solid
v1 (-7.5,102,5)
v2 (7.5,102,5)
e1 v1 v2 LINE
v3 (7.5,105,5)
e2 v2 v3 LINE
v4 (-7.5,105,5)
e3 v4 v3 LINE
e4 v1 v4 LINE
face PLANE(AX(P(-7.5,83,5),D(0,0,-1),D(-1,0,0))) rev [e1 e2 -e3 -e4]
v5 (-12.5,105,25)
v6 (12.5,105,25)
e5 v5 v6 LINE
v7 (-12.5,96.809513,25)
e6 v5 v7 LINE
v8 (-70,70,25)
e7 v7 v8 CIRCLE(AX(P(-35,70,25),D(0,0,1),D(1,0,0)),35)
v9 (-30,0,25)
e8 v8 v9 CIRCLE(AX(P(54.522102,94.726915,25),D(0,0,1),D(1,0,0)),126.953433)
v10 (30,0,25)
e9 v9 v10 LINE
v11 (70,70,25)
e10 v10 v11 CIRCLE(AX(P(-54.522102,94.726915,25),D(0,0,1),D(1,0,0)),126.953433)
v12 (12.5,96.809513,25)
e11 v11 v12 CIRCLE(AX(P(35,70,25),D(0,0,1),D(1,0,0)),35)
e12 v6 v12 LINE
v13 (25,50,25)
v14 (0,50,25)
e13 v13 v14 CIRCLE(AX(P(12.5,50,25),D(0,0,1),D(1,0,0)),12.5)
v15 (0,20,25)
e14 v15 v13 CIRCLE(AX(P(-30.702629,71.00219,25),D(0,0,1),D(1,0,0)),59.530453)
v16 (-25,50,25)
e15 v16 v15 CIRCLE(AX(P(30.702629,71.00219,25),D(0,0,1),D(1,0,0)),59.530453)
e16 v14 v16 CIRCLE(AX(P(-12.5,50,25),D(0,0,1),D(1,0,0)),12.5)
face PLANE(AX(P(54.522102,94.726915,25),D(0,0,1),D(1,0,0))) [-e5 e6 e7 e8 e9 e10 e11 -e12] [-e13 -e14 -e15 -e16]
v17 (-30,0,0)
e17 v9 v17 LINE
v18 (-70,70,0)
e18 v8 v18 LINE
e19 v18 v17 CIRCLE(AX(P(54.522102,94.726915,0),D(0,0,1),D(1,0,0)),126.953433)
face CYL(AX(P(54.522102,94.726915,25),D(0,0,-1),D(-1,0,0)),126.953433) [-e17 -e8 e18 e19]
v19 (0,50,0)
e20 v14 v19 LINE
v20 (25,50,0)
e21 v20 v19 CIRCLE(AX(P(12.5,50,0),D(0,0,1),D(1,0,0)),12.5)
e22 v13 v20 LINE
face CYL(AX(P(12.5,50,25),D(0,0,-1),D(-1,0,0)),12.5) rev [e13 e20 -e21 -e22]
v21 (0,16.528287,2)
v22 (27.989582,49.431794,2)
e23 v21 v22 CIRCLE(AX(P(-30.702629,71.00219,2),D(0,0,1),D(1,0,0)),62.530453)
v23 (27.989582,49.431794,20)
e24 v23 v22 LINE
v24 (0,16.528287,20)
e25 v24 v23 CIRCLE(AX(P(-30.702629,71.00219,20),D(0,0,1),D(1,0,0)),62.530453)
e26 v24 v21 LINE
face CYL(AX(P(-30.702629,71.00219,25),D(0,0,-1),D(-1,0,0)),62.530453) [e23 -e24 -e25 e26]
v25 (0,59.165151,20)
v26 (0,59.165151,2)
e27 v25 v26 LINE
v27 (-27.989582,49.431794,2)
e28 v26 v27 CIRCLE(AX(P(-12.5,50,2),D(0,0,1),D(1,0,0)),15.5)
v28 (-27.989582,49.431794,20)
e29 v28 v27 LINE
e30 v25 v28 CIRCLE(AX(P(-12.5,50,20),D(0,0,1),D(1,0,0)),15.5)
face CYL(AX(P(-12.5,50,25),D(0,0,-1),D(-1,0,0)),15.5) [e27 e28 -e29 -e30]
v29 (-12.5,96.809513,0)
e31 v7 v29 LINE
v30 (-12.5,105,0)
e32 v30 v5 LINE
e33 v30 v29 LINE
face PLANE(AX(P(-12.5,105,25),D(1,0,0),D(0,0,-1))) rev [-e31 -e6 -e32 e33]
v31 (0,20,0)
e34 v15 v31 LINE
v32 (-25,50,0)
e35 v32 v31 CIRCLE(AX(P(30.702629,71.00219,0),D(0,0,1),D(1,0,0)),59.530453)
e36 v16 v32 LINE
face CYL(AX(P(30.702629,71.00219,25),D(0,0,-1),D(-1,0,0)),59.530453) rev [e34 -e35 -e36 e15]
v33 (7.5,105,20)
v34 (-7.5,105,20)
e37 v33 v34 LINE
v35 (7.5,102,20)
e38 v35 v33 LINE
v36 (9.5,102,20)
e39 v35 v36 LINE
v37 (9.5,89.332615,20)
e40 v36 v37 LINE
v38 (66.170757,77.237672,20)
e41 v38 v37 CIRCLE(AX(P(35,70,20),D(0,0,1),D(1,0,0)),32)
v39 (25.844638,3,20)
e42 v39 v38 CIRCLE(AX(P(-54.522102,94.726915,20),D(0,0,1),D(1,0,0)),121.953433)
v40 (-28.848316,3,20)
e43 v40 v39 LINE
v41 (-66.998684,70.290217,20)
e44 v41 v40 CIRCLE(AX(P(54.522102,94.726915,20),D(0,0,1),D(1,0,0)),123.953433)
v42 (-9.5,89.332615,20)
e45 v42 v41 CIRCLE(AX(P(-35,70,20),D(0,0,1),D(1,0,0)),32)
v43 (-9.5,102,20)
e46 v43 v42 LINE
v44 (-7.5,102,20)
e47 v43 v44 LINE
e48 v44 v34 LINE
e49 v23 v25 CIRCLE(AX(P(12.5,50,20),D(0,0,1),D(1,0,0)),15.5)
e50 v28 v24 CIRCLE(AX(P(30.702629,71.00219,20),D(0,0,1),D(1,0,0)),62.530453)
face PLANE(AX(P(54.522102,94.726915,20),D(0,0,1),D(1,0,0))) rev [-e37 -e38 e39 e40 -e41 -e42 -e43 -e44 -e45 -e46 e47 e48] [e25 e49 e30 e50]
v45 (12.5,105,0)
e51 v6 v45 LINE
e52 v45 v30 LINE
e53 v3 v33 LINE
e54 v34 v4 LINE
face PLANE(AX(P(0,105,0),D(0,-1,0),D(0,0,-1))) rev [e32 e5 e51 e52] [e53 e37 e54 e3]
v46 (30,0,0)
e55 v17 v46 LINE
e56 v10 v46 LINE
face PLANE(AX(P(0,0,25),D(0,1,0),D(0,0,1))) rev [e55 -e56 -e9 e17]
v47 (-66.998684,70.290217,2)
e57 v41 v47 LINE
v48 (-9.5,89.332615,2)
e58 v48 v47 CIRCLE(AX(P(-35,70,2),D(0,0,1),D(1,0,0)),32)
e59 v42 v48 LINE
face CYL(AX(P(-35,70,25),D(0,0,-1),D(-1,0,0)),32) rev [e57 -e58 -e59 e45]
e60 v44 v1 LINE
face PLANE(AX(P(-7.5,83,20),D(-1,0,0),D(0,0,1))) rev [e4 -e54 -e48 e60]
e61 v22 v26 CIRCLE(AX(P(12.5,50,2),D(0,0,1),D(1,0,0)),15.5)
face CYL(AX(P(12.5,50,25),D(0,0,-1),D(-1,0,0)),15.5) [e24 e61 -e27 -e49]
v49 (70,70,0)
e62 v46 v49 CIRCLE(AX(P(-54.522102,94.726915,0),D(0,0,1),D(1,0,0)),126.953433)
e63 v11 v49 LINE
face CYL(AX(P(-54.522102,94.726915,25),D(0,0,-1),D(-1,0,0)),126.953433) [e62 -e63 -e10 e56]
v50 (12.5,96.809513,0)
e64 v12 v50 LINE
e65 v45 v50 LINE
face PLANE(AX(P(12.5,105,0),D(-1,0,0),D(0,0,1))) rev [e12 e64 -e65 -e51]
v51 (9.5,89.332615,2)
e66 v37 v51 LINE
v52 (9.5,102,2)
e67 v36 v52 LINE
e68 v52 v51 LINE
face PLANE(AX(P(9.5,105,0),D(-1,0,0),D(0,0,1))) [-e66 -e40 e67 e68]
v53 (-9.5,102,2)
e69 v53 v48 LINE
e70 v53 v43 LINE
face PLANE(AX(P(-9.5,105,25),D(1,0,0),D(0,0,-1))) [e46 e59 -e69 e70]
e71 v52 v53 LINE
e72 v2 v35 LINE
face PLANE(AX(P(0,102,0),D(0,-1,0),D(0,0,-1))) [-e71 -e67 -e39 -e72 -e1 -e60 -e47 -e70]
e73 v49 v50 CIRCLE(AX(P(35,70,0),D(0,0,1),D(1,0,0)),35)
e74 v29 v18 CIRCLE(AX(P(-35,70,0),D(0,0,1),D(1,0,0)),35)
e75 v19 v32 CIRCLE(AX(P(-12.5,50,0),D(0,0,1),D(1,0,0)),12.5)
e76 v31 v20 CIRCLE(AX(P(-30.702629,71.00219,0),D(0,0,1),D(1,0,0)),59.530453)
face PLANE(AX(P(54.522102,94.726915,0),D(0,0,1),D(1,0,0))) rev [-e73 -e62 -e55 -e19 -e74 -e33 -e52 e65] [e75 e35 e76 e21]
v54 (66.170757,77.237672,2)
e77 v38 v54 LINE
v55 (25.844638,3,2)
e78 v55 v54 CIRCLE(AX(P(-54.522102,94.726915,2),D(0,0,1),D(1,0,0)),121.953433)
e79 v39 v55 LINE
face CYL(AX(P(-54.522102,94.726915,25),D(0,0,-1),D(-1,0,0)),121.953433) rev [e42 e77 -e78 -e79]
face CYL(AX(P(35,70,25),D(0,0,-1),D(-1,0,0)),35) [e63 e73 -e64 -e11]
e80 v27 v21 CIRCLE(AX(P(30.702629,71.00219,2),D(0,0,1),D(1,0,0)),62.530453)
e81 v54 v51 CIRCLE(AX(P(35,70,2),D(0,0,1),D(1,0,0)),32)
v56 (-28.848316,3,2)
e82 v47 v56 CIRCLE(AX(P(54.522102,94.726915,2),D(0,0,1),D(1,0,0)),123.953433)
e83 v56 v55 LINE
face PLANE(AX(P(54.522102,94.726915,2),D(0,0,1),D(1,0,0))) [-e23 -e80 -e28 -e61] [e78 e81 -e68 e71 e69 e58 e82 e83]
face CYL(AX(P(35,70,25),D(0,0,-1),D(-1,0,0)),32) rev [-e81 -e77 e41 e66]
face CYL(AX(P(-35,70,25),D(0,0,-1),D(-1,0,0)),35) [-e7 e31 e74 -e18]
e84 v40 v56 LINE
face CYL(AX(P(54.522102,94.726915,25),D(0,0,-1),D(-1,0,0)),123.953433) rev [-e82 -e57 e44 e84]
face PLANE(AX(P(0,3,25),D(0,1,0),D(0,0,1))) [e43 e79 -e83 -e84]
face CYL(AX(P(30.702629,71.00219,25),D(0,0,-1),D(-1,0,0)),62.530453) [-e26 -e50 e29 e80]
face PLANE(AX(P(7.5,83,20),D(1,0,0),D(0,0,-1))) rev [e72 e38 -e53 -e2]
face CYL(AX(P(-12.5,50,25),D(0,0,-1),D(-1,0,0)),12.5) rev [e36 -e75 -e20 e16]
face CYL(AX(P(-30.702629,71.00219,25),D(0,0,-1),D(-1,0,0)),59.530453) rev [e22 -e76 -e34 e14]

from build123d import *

# Parameters (mm, degrees)
SALIENTE_EXTRUIR1_DEPTH = 25
CORTAR_EXTRUIR1_DEPTH   = 25
CROQUIS5_W              = 25
CROQUIS5_H              = 25
SALIENTE_EXTRUIR2_DEPTH = 35
VACIADO14_START         = 2
VACIADO14_DEPTH         = 18
CROQUIS14_W             = 15
CROQUIS14_H             = 15
CORTAR_EXTRUIR3_DEPTH   = 37


# Read off the part's stored shape, not the designer's step: Vaciado14
with BuildPart() as part:
    # Croquis1 → Saliente-Extruir1 (new body)
    with BuildSketch(Plane.XY):
        with BuildLine():
            Line((0, 0), (30, 0))
            ThreePointArc((30, 0), (55.704345855, 31.740373797), (70, 70))
            ThreePointArc((70, 70), (49.790199458, 101.721443851), (12.5, 96.809513237))
            Line((12.5, 96.809513237), (12.5, 70))
            Line((12.5, 70), (0, 70))
            Line((0, 70), (-12.5, 70))
            Line((-12.5, 70), (-12.5, 96.809513237))
            ThreePointArc((-12.5, 96.809513237), (-49.790199458, 101.721443851), (-70, 70))
            ThreePointArc((-70, 70), (-55.704345855, 31.740373797), (-30, 0))
            Line((-30, 0), (0, 0))
        make_face()
    extrude(amount=SALIENTE_EXTRUIR1_DEPTH)

    # Croquis2 → Cortar-Extruir1 (cut)
    with BuildSketch(Plane.XY):
        with BuildLine():
            ThreePointArc((25, 50), (12.5, 62.5), (0, 50))
            ThreePointArc((0, 50), (-12.5, 62.5), (-25, 50))
            ThreePointArc((-25, 50), (-15.02993221, 32.891723159), (0, 20))
            ThreePointArc((0, 20), (15.02993221, 32.891723159), (25, 50))
        make_face()
    extrude(amount=CORTAR_EXTRUIR1_DEPTH, mode=Mode.SUBTRACT)

    # Croquis5 → Saliente-Extruir2 (add)
    with BuildSketch(Plane(origin=(0, 70, 0), x_dir=(1, 0, 0), z_dir=(0, 1, 0))):
        with Locations((0, -12.5)):
            Rectangle(CROQUIS5_W, CROQUIS5_H)
    extrude(amount=SALIENTE_EXTRUIR2_DEPTH)

    # Vaciado14 outline → Vaciado14 (cut)
    with BuildSketch(Plane.XY.offset(VACIADO14_START)):
        with BuildLine():
            Line((-28.84831613, 3), (25.844637923, 3))
            ThreePointArc((25.844637923, 3), (52.641551282, 36.515307349), (66.170757203, 77.237671959))
            ThreePointArc((66.170757203, 77.237671959), (41.679167851, 101.2951868), (9.5, 89.332614929))
            Line((9.5, 89.332614929), (9.5, 102))
            Line((9.5, 102), (-9.5, 102))
            Line((-9.5, 102), (-9.5, 89.332614929))
            ThreePointArc((-9.5, 89.332614929), (-45.060390177, 100.377434873), (-66.998683941, 70.290217258))
            ThreePointArc((-66.998683941, 70.290217258), (-53.306904817, 33.592972957), (-28.84831613, 3))
        make_face()
        with BuildLine():
            ThreePointArc((0, 59.16515139), (17.591066798, 64.640049141), (27.989581723, 49.43179402))
            ThreePointArc((27.989581723, 49.43179402), (16.926348915, 30.486291666), (0, 16.528287079))
            ThreePointArc((0, 16.528287079), (-16.926348915, 30.486291666), (-27.989581723, 49.43179402))
            ThreePointArc((-27.989581723, 49.43179402), (-17.591066798, 64.640049141), (0, 59.16515139))
        make_face(mode=Mode.SUBTRACT)
    extrude(amount=VACIADO14_DEPTH, mode=Mode.SUBTRACT)

    # Croquis14 → Cortar-Extruir3 (cut)
    with BuildSketch(Plane(origin=(0, 120, 0), x_dir=(1, 0, 0), z_dir=(0, 1, 0))):
        with Locations((0, -12.5)):
            Rectangle(CROQUIS14_W, CROQUIS14_H)
    extrude(amount=-CORTAR_EXTRUIR3_DEPTH, mode=Mode.SUBTRACT)


solid = part.part
